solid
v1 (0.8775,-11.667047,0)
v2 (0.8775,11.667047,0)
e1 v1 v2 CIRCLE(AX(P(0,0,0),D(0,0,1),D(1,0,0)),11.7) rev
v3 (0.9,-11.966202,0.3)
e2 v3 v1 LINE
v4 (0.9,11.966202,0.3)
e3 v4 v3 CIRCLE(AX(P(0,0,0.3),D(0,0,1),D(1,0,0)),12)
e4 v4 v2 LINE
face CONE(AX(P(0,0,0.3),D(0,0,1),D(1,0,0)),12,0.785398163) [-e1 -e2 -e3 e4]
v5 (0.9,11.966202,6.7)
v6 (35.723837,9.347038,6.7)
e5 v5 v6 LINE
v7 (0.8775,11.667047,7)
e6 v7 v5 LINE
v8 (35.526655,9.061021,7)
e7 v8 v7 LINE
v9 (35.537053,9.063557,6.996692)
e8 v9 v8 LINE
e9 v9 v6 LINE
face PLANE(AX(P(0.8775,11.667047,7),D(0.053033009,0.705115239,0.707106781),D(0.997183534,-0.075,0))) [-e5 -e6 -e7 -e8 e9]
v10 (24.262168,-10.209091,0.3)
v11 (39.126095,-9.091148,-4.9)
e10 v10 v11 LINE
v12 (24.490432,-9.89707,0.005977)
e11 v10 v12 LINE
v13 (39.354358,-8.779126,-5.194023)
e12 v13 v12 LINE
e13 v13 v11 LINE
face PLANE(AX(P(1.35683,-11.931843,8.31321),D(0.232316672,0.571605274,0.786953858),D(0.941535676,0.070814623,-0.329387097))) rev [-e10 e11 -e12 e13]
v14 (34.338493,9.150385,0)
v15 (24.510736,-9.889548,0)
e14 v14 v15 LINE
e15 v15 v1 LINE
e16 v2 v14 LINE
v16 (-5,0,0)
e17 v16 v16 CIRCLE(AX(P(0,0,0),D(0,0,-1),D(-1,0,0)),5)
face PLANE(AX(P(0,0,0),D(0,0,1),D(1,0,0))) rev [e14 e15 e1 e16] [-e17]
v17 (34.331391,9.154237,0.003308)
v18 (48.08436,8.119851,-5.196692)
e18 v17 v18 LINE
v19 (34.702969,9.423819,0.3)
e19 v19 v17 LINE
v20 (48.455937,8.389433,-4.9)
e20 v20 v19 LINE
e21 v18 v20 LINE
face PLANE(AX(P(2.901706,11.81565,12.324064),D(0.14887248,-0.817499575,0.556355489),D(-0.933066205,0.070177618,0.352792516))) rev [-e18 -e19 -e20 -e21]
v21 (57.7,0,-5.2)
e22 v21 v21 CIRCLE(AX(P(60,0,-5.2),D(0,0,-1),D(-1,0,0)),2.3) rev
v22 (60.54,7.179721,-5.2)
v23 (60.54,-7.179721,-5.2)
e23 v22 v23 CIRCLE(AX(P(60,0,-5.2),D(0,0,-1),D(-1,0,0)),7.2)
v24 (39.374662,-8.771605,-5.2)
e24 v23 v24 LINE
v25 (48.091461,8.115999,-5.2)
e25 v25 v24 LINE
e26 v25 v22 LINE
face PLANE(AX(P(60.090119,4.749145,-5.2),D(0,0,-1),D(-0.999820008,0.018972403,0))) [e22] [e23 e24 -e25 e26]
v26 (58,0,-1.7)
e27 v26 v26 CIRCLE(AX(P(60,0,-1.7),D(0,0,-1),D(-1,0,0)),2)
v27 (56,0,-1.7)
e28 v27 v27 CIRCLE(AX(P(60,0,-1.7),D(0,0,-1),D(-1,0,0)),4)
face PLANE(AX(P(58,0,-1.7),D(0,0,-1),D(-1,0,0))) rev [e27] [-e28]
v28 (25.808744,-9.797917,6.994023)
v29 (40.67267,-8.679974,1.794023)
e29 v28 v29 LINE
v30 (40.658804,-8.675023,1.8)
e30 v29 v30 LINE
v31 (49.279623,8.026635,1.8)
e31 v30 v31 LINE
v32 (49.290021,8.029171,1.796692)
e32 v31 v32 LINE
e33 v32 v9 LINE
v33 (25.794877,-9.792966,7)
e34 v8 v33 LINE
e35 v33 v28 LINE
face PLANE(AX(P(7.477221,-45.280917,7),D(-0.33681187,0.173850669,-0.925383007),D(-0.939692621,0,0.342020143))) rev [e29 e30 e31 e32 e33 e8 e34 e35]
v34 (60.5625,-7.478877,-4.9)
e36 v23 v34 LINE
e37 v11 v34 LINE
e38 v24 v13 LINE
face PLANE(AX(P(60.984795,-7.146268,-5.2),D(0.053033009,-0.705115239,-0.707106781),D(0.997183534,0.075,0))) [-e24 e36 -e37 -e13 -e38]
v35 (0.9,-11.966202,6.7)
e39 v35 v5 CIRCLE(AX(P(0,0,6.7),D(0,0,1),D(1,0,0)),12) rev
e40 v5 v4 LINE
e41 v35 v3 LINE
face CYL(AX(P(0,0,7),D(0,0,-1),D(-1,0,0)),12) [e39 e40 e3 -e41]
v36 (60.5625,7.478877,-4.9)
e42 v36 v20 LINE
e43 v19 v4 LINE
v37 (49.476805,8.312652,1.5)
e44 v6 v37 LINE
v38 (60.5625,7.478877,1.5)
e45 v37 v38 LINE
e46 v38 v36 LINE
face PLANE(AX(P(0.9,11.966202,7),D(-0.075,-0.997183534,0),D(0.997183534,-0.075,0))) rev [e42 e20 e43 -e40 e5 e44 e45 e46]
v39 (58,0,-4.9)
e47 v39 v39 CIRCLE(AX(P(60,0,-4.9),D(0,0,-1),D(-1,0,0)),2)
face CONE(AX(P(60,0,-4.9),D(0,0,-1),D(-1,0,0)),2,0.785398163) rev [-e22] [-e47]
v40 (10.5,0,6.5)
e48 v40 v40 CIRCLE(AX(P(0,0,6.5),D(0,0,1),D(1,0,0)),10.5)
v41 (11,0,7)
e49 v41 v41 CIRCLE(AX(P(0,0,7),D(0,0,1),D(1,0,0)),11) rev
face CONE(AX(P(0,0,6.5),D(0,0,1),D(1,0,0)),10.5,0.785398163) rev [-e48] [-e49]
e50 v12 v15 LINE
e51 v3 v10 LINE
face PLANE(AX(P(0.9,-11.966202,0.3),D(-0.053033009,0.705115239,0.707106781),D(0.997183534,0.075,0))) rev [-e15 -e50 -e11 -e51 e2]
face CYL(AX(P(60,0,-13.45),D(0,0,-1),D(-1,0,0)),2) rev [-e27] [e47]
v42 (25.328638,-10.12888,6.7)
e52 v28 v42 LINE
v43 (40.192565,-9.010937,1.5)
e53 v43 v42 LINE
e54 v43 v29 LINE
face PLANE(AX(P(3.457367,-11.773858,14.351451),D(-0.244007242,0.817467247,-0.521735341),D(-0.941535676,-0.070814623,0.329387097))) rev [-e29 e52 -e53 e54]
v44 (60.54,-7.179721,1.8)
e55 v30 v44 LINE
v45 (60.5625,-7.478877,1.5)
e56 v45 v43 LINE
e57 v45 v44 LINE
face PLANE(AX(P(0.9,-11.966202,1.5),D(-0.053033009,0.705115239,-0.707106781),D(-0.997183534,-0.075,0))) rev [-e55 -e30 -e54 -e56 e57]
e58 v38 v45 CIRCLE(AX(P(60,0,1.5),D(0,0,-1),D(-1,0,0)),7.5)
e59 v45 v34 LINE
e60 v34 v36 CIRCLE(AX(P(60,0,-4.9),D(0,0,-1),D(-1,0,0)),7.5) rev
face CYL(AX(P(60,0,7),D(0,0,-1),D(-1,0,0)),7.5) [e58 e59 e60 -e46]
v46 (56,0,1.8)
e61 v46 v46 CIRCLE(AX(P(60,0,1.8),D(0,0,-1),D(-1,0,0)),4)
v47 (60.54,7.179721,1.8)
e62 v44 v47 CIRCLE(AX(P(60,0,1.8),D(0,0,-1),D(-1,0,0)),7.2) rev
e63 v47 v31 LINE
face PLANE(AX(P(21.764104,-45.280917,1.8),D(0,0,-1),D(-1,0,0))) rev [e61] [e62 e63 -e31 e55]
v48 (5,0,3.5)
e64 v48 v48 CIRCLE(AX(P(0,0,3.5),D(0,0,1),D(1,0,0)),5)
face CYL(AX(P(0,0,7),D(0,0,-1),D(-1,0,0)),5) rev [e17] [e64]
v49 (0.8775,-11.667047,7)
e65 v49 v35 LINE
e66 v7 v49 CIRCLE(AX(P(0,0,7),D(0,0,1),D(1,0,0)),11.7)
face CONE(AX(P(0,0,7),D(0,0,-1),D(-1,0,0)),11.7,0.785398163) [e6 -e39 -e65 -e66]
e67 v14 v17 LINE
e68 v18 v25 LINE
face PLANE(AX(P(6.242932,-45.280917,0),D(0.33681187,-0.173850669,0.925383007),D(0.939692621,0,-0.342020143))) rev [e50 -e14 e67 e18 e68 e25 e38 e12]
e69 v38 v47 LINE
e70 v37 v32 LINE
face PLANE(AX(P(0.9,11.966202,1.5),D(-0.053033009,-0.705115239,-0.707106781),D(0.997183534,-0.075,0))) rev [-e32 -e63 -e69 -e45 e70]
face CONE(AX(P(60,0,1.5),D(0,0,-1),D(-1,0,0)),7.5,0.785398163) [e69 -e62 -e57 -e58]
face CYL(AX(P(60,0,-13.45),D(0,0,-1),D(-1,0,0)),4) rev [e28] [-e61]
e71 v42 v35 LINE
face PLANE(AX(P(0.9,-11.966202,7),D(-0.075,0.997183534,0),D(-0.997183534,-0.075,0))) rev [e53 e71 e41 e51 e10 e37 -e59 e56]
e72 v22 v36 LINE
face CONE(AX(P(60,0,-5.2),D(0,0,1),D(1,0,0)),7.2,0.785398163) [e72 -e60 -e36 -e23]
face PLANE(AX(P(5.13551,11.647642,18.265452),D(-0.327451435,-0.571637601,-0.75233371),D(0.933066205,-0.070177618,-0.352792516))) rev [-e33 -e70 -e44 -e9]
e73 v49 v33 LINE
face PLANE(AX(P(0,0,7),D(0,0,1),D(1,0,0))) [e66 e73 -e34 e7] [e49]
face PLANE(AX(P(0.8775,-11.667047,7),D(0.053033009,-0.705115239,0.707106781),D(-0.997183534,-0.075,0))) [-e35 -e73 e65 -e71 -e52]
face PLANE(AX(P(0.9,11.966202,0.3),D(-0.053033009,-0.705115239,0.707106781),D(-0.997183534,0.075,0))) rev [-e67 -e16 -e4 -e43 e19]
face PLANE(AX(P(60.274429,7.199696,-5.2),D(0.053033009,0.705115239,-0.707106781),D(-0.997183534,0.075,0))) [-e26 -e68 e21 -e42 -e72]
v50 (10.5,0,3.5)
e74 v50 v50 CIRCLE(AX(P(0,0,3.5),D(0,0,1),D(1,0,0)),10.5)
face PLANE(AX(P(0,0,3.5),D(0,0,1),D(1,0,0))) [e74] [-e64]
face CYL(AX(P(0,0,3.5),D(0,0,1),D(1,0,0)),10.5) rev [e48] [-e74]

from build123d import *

# Parameters (mm, degrees)
EXTRUDE_1_DEPTH     = 7
SKETCH_2_R          = 10.5
CUT_EXTRUDE_1_DEPTH = 3.5
SKETCH_3_R          = 5
CUT_EXTRUDE_2_DEPTH = 69.914802474
EXTRUDE_START       = 5.2
EXTRUDE_2_DEPTH     = 5.2
CUT_EXTRUDE_START   = -10.220454921
CUT_EXTRUDE_3_DEPTH = 45.240565609
CHAMFER_1_SIZE      = 0.5
CHAMFER_2_SIZE      = 0.3
CHAMFER_3_SIZE      = 0.3
CHAMFER_3_SIZE_2    = 0.254518099
CHAMFER_3_SIZE_3    = 0.383899621
CHAMFER_3_SIZE_4    = 0.356772393
CHAMFER_3_SIZE_5    = 0.263835418


with BuildPart() as part:
    # 草图1 → 凸台-拉伸1 (new body)
    with BuildSketch(Plane.XY):
        with BuildLine():
            Line((0.9, -11.966202405), (60.5625, -7.478876503))
            ThreePointArc((60.5625, -7.478876503), (67.5, 0), (60.5625, 7.478876503))
            Line((60.5625, 7.478876503), (0.9, 11.966202405))
            ThreePointArc((0.9, 11.966202405), (-12, 0), (0.9, -11.966202405))
        make_face()
    extrude(amount=EXTRUDE_1_DEPTH)

    # 草图2 → 切除-拉伸1 (cut)
    with BuildSketch(Plane.XY.offset(7)):
        Circle(SKETCH_2_R)
    extrude(amount=-CUT_EXTRUDE_1_DEPTH, mode=Mode.SUBTRACT)

    # 草图3 → 切除-拉伸2 (cut, through all)
    with BuildSketch(Plane(origin=(0, 0, 0), x_dir=(-1, 0, 0), z_dir=(0, 0, -1))):
        Circle(SKETCH_3_R)
    extrude(amount=-CUT_EXTRUDE_2_DEPTH, mode=Mode.SUBTRACT)

    # 草图4 → 凸台-拉伸2 (add)
    with BuildSketch(Plane(origin=(0, 0, 0), x_dir=(-1, 0, 0), z_dir=(0, 0, -1)).offset(EXTRUDE_START)):
        with BuildLine():
            Line((-24.349176843, -10.202546866), (-34.487976367, 9.439989183))
            Line((-34.487976367, 9.439989183), (-60.5625, 7.478876503))
            ThreePointArc((-60.5625, 7.478876503), (-67.5, 0), (-60.5625, -7.478876503))
            Line((-60.5625, -7.478876503), (-24.349176843, -10.202546866))
        make_face()
    extrude(amount=-EXTRUDE_2_DEPTH)

    # 切除-拉伸3: read off the stored shape, not the designer's step
    # 切除-拉伸3 outline → 切除-拉伸3 (cut)
    with BuildSketch(Plane(origin=(0, 0, 0), x_dir=(0.8886074479712769, -0.45866851146549686, 0), z_dir=(0.45866851146549686, 0.8886074479712767, 0)).offset(CUT_EXTRUDE_START)):
        Polygon((26.316446878, 5.2), (26.316446878, 0), (39.011877148, 5.2), align=None)
        Polygon((62, -7), (62, -1.8), (40.108675427, -1.8), (27.413245157, -7), align=None)
    extrude(amount=CUT_EXTRUDE_3_DEPTH, mode=Mode.SUBTRACT)

    # 草图6 → 切除-旋转1 (revolve, cut)
    with BuildSketch(Plane(origin=(0, 0, 0), x_dir=(1, 0, 0), z_dir=(0, 1, 0))):
        Polygon((60, 5.2), (58, 5.2), (58, 1.7), (56, 1.7), (56, -1.8), (60, -1.8), align=None)
    revolve(axis=Axis((60, 0, -13.45), (0, 0, 1)), mode=Mode.SUBTRACT)

    # 倒角1
    chamfer_1_edges = [part.edges().sort_by_distance(p)[0] for p in [
        (-10.5, 0, 7),
    ]]
    chamfer(chamfer_1_edges, length=CHAMFER_1_SIZE)

    # 倒角2
    chamfer_2_edges = [part.edges().sort_by_distance(p)[0] for p in [
        (62, 0, -5.2),
    ]]
    chamfer(chamfer_2_edges, length=CHAMFER_2_SIZE)

    # 倒角3
    # the kernel refuses this chamfer: 0.383899621, 0.356772393, 0.3, 0.263835418, 0.254518099 mm, written as the material it takes off along each edge
    with BuildSketch(Plane(origin=(60.5625, -7.478876503, -5.2), x_dir=(-0.07499999999999998, 0.9971835337589565, 0), z_dir=(-0.9971835337589565, -0.07499999999999998, 0))) as chamfer_3_piece_1:
        Polygon((CHAMFER_3_SIZE, 0), (0, -CHAMFER_3_SIZE), (0, 0), align=None)
    extrude(amount=22.721254915, mode=Mode.SUBTRACT)
    with BuildSketch(Plane(origin=(60, 0, -5.2), x_dir=(0.07499999999999998, 0.9971835337589565, 0), z_dir=(-0.9971835337589565, 0.07499999999999998, 0))) as chamfer_3_piece_2:
        Polygon((7.5 - CHAMFER_3_SIZE, 0), (7.5, -CHAMFER_3_SIZE), (7.5, 0), align=None)
    revolve(axis=Axis((60, 0, -5.2), (0, 0, -1)), revolution_arc=171.397555391, mode=Mode.SUBTRACT)
    with BuildSketch(Plane(origin=(46.933080248, 8.503970126, -5.2), x_dir=(-0.07499999999999997, -0.9971835337589565, 0), z_dir=(0.9971835337589565, -0.07499999999999997, 0))) as chamfer_3_piece_3:
        Polygon((CHAMFER_3_SIZE, 0), (0, -CHAMFER_3_SIZE), (0, 0), align=None)
    extrude(amount=13.667914973, mode=Mode.SUBTRACT)
    # the kernel refuses this chamfer: 0.383899621, 0.356772393, 0.3, 0.263835418, 0.254518099 mm, written as the material it takes off along each edge
    with BuildSketch(Plane(origin=(0.9, -11.966202405, 0), x_dir=(-0.07499999999999997, 0.9971835337589565, 0), z_dir=(0.9971835337589566, 0.07499999999999997, 0))) as chamfer_3_2_piece_1_section:
        Polygon((CHAMFER_3_SIZE, 0), (0, CHAMFER_3_SIZE), (0, 0), align=None)
    chamfer_3_2_piece_1 = extrude(amount=24.286912089, mode=Mode.PRIVATE)
    chamfer_3_2_piece_1 = split(chamfer_3_2_piece_1, bisect_by=Plane(origin=(3.45685625, -13.285963401, 7.024904811), z_dir=(-0.33681186979171107, 0.17385066860959783, -0.9253830068633244)), keep=Keep.TOP, mode=Mode.PRIVATE)
    add(chamfer_3_2_piece_1, mode=Mode.SUBTRACT)
    with BuildSketch(Plane(origin=(35.257308346, 9.382126316, 0), x_dir=(0, 0, 1), z_dir=(-0.9971835337589566, 0.075, 0))) as chamfer_3_2_piece_2_section:
        Polygon((CHAMFER_3_SIZE, 0), (0, -CHAMFER_3_SIZE), (0, 0), align=None)
    chamfer_3_2_piece_2 = extrude(amount=34.454347854, mode=Mode.PRIVATE)
    chamfer_3_2_piece_2 = split(chamfer_3_2_piece_2, bisect_by=Plane(origin=(35.166645448, 9.428923377, -0.249094265), z_dir=(-0.33681186979171107, 0.17385066860959783, -0.9253830068633244)), keep=Keep.TOP, mode=Mode.PRIVATE)
    add(chamfer_3_2_piece_2, mode=Mode.SUBTRACT)
    with BuildSketch(Plane(origin=(0, 0, 0), x_dir=(0.07500000000000011, 0.9971835337589566, 0), z_dir=(0.9971835337589566, -0.07500000000000011, 0))) as chamfer_3_2_piece_3:
        Polygon((12 - CHAMFER_3_SIZE, 0), (12, CHAMFER_3_SIZE), (12, 0), align=None)
    revolve(axis=Axis((0, 0, 0), (0, 0, 1)), revolution_arc=188.602444609, mode=Mode.SUBTRACT)
    # the kernel refuses this chamfer: 0.383899621, 0.356772393, 0.3, 0.263835418, 0.254518099 mm, written as the material it takes off along each edge
    with BuildSketch(Plane(origin=(39.590447843, -9.056222958, -5.332010389), x_dir=(0.3284593891924205, 0.024704032262311923, 0.9441949695064703), z_dir=(-0.9415356762498924, -0.07081462271298539, 0.3293870968308798))) as chamfer_3_3_piece_1_section:
        Polygon((CHAMFER_3_SIZE_2 * 0.999999998644, 0), (CHAMFER_3_SIZE * 0.198621914305, CHAMFER_3_SIZE * 0.980076188446), (0, 0), align=None)
    chamfer_3_3_piece_1 = extrude(amount=17.869959702, mode=Mode.PRIVATE)
    chamfer_3_3_piece_1 = split(chamfer_3_3_piece_1, bisect_by=Plane(origin=(39.379247454, -6.248148947, -2.516005194), z_dir=(0.05303300858899107, -0.7051152388085232, -0.7071067811865471)), keep=Keep.TOP, mode=Mode.PRIVATE)
    add(chamfer_3_3_piece_1, mode=Mode.SUBTRACT)
    # the kernel refuses this chamfer: 0.383899621, 0.356772393, 0.3, 0.263835418, 0.254518099 mm, written as the material it takes off along each edge
    with BuildSketch(Plane(origin=(39.727912607, -9.045883981, 1.8), x_dir=(-0.07499999999999996, 0.9971835337589565, 0), z_dir=(0.9971835337589566, 0.07499999999999997, 0))) as chamfer_3_4_piece_1_section:
        Polygon((CHAMFER_3_SIZE, 0), (0, -CHAMFER_3_SIZE), (0, 0), align=None)
    chamfer_3_4_piece_1 = extrude(amount=20.893433042, mode=Mode.PRIVATE)
    chamfer_3_4_piece_1 = split(chamfer_3_4_piece_1, bisect_by=Plane(origin=(39.811799189, -9.089183341, 2.030476488), z_dir=(0.33681186979171107, -0.17385066860959783, 0.9253830068633244)), keep=Keep.TOP, mode=Mode.PRIVATE)
    add(chamfer_3_4_piece_1, mode=Mode.SUBTRACT)
    with BuildSketch(Plane(origin=(60, 0, 1.8), x_dir=(0.075, 0.9971835337589565, 0), z_dir=(-0.9971835337589565, 0.075, 0))) as chamfer_3_4_piece_2:
        Polygon((7.5 - CHAMFER_3_SIZE, 0), (7.5, CHAMFER_3_SIZE), (7.5, 0), align=None)
    revolve(axis=Axis((60, 0, 1.8), (0, 0, -1)), revolution_arc=171.397555391, mode=Mode.SUBTRACT)
    with BuildSketch(Plane(origin=(60.5625, 7.478876503, 1.8), x_dir=(-0.07499999999999998, -0.9971835337589565, 0), z_dir=(-0.9971835337589566, 0.075, 0))) as chamfer_3_4_piece_3_section:
        Polygon((CHAMFER_3_SIZE, 0), (0, -CHAMFER_3_SIZE), (0, 0), align=None)
    chamfer_3_4_piece_3 = extrude(amount=11.936343353, mode=Mode.PRIVATE)
    chamfer_3_4_piece_3 = split(chamfer_3_4_piece_3, bisect_by=Plane(origin=(59.250471243, 8.156100488, -1.804769384), z_dir=(0.33681186979171107, -0.17385066860959783, 0.9253830068633244)), keep=Keep.TOP, mode=Mode.PRIVATE)
    add(chamfer_3_4_piece_3, mode=Mode.SUBTRACT)
    # the kernel refuses this chamfer: 0.383899621, 0.356772393, 0.3, 0.263835418, 0.254518099 mm, written as the material it takes off along each edge
    with BuildSketch(Plane(origin=(42.288756392, -8.85327823, 1.173257023), x_dir=(-0.3284593891924201, -0.02470403226231695, -0.9441949695064704), z_dir=(-0.9415356762498924, -0.07081462271298539, 0.3293870968308797))) as chamfer_3_5_piece_1_section:
        Polygon((CHAMFER_3_SIZE_3 * 1.0000000011, 0), (-CHAMFER_3_SIZE * 0.198621914305, -CHAMFER_3_SIZE * 0.980076188446), (0, 0), align=None)
    chamfer_3_5_piece_1 = extrude(amount=19.376005008, mode=Mode.PRIVATE)
    chamfer_3_5_piece_1 = split(chamfer_3_5_piece_1, bisect_by=Plane(origin=(42.301009253, -9.016189588, 1.336628512), z_dir=(0.053033008588990585, -0.7051152388085168, 0.7071067811865535)), keep=Keep.TOP, mode=Mode.PRIVATE)
    add(chamfer_3_5_piece_1, mode=Mode.SUBTRACT)
    # the kernel refuses this chamfer: 0.383899621, 0.356772393, 0.3, 0.263835418, 0.254518099 mm, written as the material it takes off along each edge
    with BuildSketch(Plane(origin=(0.9, -11.966202405, 7), x_dir=(-0.07499999999999997, 0.9971835337589565, 0), z_dir=(0.9971835337589566, 0.07499999999999997, 0))) as chamfer_3_6_piece_1:
        Polygon((CHAMFER_3_SIZE, 0), (0, -CHAMFER_3_SIZE), (0, 0), align=None)
    extrude(amount=25.952193485, mode=Mode.SUBTRACT)
    with BuildSketch(Plane(origin=(36.984003052, 9.252258445, 7), x_dir=(-0.075, -0.9971835337589565, 0), z_dir=(-0.9971835337589566, 0.075, 0))) as chamfer_3_6_piece_2:
        Polygon((CHAMFER_3_SIZE, 0), (0, -CHAMFER_3_SIZE), (0, 0), align=None)
    extrude(amount=36.185919473, mode=Mode.SUBTRACT)
    with BuildSketch(Plane(origin=(0, 0, 7), x_dir=(0.07500000000000011, 0.9971835337589566, 0), z_dir=(0.9971835337589566, -0.07500000000000011, 0))) as chamfer_3_6_piece_3:
        Polygon((12 - CHAMFER_3_SIZE, 0), (12, -CHAMFER_3_SIZE), (12, 0), align=None)
    revolve(axis=Axis((0, 0, 7), (0, 0, 1)), revolution_arc=188.602444609, mode=Mode.SUBTRACT)
    # the kernel refuses this chamfer: 0.383899621, 0.356772393, 0.3, 0.263835418, 0.254518099 mm, written as the material it takes off along each edge
    with BuildSketch(Plane(origin=(32.83531163, 9.564289125, 0.624872862), x_dir=(-0.12627439013591127, -0.9822683171715932, -0.13857752875805598), z_dir=(0.9330662049196804, -0.07017761826168661, -0.3527925156971192))) as chamfer_3_7_piece_1_section:
        Polygon((CHAMFER_3_SIZE, 0), (-CHAMFER_3_SIZE_4 * 0.148100133729, -CHAMFER_3_SIZE_4 * 0.988972370164), (0, 0), align=None)
    chamfer_3_7_piece_1 = extrude(amount=17.22586636, mode=Mode.PRIVATE)
    chamfer_3_7_piece_1 = split(chamfer_3_7_piece_1, bisect_by=Plane(origin=(32.847494362, 9.72626806, 0.462436431), z_dir=(0.05303300858899109, 0.7051152388085231, -0.7071067811865475)), keep=Keep.TOP, mode=Mode.PRIVATE)
    add(chamfer_3_7_piece_1, mode=Mode.SUBTRACT)
    # the kernel refuses this chamfer: 0.383899621, 0.356772393, 0.3, 0.263835418, 0.254518099 mm, written as the material it takes off along each edge
    with BuildSketch(Plane(origin=(35.245808416, 9.382991247, 7.162707961), x_dir=(-0.351798887486564, 0.026459438677302174, -0.935701576822492), z_dir=(0.9330662049196804, -0.07017761826168642, -0.35279251569711917))) as chamfer_3_8_piece_1_section:
        Polygon((CHAMFER_3_SIZE_5 * 1.00000000141, 0), (CHAMFER_3_SIZE * 0.148100133836, -CHAMFER_3_SIZE * 0.988972370877), (0, 0), align=None)
    chamfer_3_8_piece_1 = extrude(amount=16.82260493, mode=Mode.PRIVATE)
    chamfer_3_8_piece_1 = split(chamfer_3_8_piece_1, bisect_by=Plane(origin=(35.033456868, 6.559611679, 4.33135398), z_dir=(0.05303300858899218, 0.7051152388085377, 0.7071067811865327)), keep=Keep.TOP, mode=Mode.PRIVATE)
    add(chamfer_3_8_piece_1, mode=Mode.SUBTRACT)


solid = part.part
